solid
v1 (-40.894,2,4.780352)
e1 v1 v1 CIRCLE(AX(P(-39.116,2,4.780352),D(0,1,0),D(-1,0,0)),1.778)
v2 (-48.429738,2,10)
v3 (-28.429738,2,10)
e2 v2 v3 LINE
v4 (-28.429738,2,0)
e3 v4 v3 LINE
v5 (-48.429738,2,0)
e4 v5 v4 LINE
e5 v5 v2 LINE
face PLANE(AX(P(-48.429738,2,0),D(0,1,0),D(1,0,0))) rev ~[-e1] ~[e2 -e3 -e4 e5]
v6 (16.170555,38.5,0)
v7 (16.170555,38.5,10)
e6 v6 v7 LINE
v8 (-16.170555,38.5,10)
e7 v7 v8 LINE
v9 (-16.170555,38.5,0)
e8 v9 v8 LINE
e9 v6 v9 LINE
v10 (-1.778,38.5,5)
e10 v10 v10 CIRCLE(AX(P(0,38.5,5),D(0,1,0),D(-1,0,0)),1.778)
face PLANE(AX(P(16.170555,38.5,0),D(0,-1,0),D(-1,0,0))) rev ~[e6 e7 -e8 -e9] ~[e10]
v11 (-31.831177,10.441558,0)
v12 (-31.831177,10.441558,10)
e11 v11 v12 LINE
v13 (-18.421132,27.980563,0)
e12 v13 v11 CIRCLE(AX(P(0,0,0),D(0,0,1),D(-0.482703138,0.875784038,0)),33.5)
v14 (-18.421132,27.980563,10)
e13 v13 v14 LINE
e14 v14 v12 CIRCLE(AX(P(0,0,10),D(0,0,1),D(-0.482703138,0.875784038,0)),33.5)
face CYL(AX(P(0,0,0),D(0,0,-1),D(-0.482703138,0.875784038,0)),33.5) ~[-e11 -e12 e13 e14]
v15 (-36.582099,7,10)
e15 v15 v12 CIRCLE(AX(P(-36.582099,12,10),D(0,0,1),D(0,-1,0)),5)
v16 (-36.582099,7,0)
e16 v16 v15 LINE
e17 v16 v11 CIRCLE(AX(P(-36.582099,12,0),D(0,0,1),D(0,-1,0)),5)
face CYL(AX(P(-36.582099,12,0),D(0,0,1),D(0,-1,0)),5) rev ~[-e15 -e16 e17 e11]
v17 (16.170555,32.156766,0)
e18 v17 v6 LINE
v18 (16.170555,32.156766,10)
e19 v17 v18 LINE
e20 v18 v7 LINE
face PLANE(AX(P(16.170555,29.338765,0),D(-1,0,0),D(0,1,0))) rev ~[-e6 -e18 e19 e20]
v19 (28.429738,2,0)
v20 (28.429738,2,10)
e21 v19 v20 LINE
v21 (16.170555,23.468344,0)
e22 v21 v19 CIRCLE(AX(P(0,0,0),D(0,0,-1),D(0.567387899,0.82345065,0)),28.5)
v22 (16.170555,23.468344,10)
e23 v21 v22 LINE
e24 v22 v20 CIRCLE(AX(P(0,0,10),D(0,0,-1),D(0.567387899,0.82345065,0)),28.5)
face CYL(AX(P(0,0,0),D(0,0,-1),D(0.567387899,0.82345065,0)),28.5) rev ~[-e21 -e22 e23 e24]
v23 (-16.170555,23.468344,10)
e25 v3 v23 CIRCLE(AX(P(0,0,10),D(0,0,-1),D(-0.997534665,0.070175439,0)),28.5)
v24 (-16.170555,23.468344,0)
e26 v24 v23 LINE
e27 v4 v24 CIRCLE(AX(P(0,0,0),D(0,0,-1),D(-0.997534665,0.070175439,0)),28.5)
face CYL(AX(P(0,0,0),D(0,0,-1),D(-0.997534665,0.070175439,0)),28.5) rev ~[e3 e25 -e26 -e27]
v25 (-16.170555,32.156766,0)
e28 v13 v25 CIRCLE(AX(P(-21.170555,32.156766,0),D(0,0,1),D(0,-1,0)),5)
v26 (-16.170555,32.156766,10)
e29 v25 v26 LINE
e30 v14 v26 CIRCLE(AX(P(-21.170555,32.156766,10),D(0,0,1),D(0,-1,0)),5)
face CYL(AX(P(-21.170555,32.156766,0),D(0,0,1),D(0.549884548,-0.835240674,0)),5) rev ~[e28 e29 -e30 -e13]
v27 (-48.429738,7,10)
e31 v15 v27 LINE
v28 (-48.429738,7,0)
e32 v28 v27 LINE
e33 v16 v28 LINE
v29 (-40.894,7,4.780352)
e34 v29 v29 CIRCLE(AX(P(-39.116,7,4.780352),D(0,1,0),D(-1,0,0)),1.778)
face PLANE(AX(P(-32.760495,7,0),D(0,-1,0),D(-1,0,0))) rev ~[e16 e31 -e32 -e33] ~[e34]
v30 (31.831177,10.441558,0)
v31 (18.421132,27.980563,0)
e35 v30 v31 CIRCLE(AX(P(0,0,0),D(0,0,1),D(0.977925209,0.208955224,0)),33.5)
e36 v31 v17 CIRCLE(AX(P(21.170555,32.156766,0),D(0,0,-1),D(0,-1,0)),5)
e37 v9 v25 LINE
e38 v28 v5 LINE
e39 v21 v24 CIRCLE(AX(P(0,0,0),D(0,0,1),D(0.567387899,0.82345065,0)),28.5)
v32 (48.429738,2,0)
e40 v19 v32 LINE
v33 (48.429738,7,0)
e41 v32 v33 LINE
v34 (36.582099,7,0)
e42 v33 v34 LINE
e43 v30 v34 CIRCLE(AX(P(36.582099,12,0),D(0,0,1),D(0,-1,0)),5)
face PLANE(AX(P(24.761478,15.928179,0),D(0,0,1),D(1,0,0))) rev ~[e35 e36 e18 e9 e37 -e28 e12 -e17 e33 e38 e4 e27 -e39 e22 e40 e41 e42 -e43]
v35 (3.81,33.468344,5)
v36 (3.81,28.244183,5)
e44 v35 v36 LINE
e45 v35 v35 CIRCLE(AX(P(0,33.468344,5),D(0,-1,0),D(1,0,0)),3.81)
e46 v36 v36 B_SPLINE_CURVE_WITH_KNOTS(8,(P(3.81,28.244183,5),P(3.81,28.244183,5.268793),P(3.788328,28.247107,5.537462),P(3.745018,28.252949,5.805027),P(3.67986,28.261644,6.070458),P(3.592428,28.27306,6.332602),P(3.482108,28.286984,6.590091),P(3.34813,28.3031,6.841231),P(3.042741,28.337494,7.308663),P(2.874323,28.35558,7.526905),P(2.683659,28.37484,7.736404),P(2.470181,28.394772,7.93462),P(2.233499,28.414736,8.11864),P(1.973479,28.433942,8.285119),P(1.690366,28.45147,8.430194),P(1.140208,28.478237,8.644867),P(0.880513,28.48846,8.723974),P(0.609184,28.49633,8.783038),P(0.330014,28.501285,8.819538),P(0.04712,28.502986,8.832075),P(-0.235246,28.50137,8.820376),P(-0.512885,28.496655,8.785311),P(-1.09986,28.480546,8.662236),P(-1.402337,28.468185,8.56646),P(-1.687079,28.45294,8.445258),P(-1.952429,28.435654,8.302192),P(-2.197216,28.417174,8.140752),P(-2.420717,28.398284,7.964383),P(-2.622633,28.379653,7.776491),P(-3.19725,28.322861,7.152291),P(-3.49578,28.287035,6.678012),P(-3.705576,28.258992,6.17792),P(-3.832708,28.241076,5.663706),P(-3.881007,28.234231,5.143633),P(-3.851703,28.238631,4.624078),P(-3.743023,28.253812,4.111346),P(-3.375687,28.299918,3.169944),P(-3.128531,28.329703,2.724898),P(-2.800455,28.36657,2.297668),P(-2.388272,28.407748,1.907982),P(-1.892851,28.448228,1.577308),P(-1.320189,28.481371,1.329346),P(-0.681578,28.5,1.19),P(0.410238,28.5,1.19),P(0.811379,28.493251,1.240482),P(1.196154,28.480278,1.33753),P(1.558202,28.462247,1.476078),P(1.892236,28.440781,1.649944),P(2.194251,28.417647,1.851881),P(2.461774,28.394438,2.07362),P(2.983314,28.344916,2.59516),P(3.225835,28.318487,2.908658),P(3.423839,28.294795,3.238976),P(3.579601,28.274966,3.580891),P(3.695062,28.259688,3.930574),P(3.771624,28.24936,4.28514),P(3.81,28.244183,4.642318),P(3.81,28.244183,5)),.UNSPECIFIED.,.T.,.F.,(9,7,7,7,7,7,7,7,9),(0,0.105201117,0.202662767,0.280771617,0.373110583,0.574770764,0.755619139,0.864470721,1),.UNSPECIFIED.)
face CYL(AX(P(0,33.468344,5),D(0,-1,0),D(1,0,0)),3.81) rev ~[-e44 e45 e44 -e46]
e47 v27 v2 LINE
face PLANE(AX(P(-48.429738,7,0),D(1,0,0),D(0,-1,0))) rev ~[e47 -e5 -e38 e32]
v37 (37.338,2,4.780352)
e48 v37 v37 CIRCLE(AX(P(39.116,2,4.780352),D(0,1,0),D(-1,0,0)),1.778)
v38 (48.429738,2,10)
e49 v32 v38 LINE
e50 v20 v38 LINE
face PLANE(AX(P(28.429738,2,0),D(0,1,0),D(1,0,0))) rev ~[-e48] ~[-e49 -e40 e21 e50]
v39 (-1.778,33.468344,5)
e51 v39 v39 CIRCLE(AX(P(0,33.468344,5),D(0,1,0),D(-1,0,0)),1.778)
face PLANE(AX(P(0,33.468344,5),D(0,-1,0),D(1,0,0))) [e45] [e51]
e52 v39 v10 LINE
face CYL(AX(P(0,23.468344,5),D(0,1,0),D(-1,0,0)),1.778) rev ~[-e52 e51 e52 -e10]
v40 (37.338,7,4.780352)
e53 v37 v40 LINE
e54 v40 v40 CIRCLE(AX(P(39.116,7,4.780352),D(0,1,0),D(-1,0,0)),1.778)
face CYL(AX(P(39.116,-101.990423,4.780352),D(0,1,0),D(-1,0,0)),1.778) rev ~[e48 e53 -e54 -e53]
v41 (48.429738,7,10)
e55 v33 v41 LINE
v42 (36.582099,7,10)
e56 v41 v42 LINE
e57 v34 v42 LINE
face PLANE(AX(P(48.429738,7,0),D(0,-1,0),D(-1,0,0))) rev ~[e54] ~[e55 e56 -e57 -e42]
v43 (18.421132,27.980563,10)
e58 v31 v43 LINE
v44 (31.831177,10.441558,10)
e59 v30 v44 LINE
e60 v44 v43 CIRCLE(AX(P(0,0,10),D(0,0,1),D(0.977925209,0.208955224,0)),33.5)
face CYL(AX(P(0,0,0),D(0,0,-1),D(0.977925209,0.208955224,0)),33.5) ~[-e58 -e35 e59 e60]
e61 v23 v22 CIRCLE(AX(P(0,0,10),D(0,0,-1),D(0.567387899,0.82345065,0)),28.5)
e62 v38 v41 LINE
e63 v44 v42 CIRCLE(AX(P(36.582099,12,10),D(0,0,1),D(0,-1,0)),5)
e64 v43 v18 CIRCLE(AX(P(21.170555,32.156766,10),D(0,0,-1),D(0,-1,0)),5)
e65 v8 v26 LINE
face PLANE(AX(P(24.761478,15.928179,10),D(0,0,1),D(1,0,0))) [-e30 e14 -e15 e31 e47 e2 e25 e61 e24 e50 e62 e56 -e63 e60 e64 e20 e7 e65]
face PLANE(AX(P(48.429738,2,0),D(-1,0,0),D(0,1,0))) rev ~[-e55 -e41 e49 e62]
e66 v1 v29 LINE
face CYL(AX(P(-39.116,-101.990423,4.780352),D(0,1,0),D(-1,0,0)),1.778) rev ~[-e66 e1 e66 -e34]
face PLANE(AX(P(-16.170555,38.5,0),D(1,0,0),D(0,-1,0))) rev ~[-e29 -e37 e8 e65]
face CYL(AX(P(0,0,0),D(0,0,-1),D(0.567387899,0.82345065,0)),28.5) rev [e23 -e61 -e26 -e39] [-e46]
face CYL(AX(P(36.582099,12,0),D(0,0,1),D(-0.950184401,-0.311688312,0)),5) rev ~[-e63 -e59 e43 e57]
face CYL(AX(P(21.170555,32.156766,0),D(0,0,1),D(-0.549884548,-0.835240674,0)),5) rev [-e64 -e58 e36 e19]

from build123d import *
from build123d import SkipClean  # not in build123d's __all__

# Parameters (mm, degrees)
F1_DEPTH       = 10
F3_D           = 3.556
F3_CBORE_D     = 7.62
F3_CBORE_DEPTH = 10
F4_DEPTH       = 10.001
F6_D           = 3.556
F7_R           = 5


# Not quite as in the source:
# - a feature names something its author has since deleted; it is built from what else it names


with BuildPart() as f1:
    # F0 (on Top) → F1 (new body)
    with BuildSketch(Plane.XY):
        with BuildLine():
            ThreePointArc((16.1705551086, 23.468343518), (24.7491207645, 14.1326225939), (28.4297379517, 2))
            Line((28.4297379517, 2), (28.4297379517, 7))
            Line((28.4297379517, 7), (32.7604945018, 7))
            ThreePointArc((32.7604945018, 7), (26.8945535829, 19.9733068763), (16.1705551086, 29.3387652685))
            Line((16.1705551086, 29.3387652685), (16.1705551086, 23.468343518))
        make_face()
        with BuildLine():
            ThreePointArc((-16.1705551086, 23.468343518), (0, 28.5), (16.1705551086, 23.468343518))
            Line((16.1705551086, 23.468343518), (16.1705551086, 29.3387652685))
            Line((16.1705551086, 29.3387652685), (-16.1705551086, 29.3387652685))
            Line((-16.1705551086, 29.3387652685), (-16.1705551086, 23.468343518))
        make_face()
        with BuildLine():
            ThreePointArc((-28.4297379517, 2), (-24.7491207645, 14.1326225939), (-16.1705551086, 23.468343518))
            Line((-16.1705551086, 23.468343518), (-16.1705551086, 29.3387652685))
            ThreePointArc((-16.1705551086, 29.3387652685), (-26.8945535829, 19.9733068763), (-32.7604945018, 7))
            Line((-32.7604945018, 7), (-28.4297379517, 7))
            Line((-28.4297379517, 7), (-28.4297379517, 2))
        make_face()
        with BuildLine():
            Line((-48.4297379517, 2), (-33.4402452144, 2))
            ThreePointArc((-33.4402452144, 2), (-33.1946454228, 4.5128167765), (-32.7604945018, 7))
            Line((-32.7604945018, 7), (-48.4297379517, 7))
            Line((-48.4297379517, 7), (-48.4297379517, 2))
        make_face()
        with BuildLine():
            Line((-33.4402452144, 2), (-28.4297379517, 2))
            Line((-28.4297379517, 2), (-28.4297379517, 7))
            Line((-28.4297379517, 7), (-32.7604945018, 7))
            ThreePointArc((-32.7604945018, 7), (-33.1946454228, 4.5128167765), (-33.4402452144, 2))
        make_face()
        with BuildLine():
            Line((28.4297379517, 7), (28.4297379517, 2))
            Line((28.4297379517, 2), (33.4402452144, 2))
            ThreePointArc((33.4402452144, 2), (33.1946454228, 4.5128167765), (32.7604945018, 7))
            Line((32.7604945018, 7), (28.4297379517, 7))
        make_face()
        with BuildLine():
            ThreePointArc((32.7604945018, 7), (33.1946454228, 4.5128167765), (33.4402452144, 2))
            Line((33.4402452144, 2), (48.4297379517, 2))
            Line((48.4297379517, 2), (48.4297379517, 7))
            Line((48.4297379517, 7), (32.7604945018, 7))
        make_face()
        with BuildLine():
            Line((-16.1705551086, 33.5), (-16.1705551086, 29.3387652685))
            ThreePointArc((-16.1705551086, 29.3387652685), (-8.3486933282, 32.4430165014), (1.811e-07, 33.5))
            Line((1.811e-07, 33.5), (-16.1705551086, 33.5))
        make_face()
        with BuildLine():
            ThreePointArc((1.811e-07, 33.5), (8.3486935036, 32.4430164563), (16.1705551086, 29.3387652685))
            Line((16.1705551086, 29.3387652685), (16.1705551086, 33.5))
            Line((16.1705551086, 33.5), (1.811e-07, 33.5))
        make_face()
        with BuildLine():
            Line((-16.1705551086, 23.468343518), (16.1705551086, 23.468343518))
            ThreePointArc((16.1705551086, 23.468343518), (0, 28.5), (-16.1705551086, 23.468343518))
        make_face()
        Polygon((-16.1705551086, 33.5), (1.811e-07, 33.5), (16.1705551086, 33.5), (16.1705551086, 38.5), (-16.1705551086, 38.5), align=None)
        with BuildLine():
            Line((-16.1705551086, 29.3387652685), (16.1705551086, 29.3387652685))
            ThreePointArc((16.1705551086, 29.3387652685), (8.3486935036, 32.4430164563), (1.811e-07, 33.5))
            ThreePointArc((1.811e-07, 33.5), (-8.3486933282, 32.4430165014), (-16.1705551086, 29.3387652685))
        make_face()
    extrude(amount=F1_DEPTH)

    # F3 (through all)
    with Locations(Plane.XZ.offset(-23.468343518)):
        with Locations((0, 5)):
            CounterBoreHole(F3_D / 2, F3_CBORE_D / 2, F3_CBORE_DEPTH)

    # F0 (on Top) → F4 (cut, through all)
    with BuildSketch(Plane.XY):
        with BuildLine():
            Line((-16.1705551086, 23.468343518), (16.1705551086, 23.468343518))
            ThreePointArc((16.1705551086, 23.468343518), (0, 28.5), (-16.1705551086, 23.468343518))
        make_face()
    with SkipClean():  # cleaning this boolean's faces spoils the solid; the shape is the same uncleaned
        extrude(amount=F4_DEPTH, mode=Mode.SUBTRACT)

    # F6 (through all)
    with Locations(Plane.XZ.offset(-2)):
        with Locations((-39.116, 4.78035165), (39.116, 4.78035165)):
            Hole(F6_D / 2)

    # F7
    f7_edges = [f1.edges().sort_by_distance(p)[0] for p in [
        (-32.760495, 7, 5),
        (32.760495, 7, 5),
        (16.170555, 29.338765, 5),
        (-16.170555, 29.338765, 5),
    ]]
    fillet(f7_edges, radius=F7_R)


solid = f1.part
